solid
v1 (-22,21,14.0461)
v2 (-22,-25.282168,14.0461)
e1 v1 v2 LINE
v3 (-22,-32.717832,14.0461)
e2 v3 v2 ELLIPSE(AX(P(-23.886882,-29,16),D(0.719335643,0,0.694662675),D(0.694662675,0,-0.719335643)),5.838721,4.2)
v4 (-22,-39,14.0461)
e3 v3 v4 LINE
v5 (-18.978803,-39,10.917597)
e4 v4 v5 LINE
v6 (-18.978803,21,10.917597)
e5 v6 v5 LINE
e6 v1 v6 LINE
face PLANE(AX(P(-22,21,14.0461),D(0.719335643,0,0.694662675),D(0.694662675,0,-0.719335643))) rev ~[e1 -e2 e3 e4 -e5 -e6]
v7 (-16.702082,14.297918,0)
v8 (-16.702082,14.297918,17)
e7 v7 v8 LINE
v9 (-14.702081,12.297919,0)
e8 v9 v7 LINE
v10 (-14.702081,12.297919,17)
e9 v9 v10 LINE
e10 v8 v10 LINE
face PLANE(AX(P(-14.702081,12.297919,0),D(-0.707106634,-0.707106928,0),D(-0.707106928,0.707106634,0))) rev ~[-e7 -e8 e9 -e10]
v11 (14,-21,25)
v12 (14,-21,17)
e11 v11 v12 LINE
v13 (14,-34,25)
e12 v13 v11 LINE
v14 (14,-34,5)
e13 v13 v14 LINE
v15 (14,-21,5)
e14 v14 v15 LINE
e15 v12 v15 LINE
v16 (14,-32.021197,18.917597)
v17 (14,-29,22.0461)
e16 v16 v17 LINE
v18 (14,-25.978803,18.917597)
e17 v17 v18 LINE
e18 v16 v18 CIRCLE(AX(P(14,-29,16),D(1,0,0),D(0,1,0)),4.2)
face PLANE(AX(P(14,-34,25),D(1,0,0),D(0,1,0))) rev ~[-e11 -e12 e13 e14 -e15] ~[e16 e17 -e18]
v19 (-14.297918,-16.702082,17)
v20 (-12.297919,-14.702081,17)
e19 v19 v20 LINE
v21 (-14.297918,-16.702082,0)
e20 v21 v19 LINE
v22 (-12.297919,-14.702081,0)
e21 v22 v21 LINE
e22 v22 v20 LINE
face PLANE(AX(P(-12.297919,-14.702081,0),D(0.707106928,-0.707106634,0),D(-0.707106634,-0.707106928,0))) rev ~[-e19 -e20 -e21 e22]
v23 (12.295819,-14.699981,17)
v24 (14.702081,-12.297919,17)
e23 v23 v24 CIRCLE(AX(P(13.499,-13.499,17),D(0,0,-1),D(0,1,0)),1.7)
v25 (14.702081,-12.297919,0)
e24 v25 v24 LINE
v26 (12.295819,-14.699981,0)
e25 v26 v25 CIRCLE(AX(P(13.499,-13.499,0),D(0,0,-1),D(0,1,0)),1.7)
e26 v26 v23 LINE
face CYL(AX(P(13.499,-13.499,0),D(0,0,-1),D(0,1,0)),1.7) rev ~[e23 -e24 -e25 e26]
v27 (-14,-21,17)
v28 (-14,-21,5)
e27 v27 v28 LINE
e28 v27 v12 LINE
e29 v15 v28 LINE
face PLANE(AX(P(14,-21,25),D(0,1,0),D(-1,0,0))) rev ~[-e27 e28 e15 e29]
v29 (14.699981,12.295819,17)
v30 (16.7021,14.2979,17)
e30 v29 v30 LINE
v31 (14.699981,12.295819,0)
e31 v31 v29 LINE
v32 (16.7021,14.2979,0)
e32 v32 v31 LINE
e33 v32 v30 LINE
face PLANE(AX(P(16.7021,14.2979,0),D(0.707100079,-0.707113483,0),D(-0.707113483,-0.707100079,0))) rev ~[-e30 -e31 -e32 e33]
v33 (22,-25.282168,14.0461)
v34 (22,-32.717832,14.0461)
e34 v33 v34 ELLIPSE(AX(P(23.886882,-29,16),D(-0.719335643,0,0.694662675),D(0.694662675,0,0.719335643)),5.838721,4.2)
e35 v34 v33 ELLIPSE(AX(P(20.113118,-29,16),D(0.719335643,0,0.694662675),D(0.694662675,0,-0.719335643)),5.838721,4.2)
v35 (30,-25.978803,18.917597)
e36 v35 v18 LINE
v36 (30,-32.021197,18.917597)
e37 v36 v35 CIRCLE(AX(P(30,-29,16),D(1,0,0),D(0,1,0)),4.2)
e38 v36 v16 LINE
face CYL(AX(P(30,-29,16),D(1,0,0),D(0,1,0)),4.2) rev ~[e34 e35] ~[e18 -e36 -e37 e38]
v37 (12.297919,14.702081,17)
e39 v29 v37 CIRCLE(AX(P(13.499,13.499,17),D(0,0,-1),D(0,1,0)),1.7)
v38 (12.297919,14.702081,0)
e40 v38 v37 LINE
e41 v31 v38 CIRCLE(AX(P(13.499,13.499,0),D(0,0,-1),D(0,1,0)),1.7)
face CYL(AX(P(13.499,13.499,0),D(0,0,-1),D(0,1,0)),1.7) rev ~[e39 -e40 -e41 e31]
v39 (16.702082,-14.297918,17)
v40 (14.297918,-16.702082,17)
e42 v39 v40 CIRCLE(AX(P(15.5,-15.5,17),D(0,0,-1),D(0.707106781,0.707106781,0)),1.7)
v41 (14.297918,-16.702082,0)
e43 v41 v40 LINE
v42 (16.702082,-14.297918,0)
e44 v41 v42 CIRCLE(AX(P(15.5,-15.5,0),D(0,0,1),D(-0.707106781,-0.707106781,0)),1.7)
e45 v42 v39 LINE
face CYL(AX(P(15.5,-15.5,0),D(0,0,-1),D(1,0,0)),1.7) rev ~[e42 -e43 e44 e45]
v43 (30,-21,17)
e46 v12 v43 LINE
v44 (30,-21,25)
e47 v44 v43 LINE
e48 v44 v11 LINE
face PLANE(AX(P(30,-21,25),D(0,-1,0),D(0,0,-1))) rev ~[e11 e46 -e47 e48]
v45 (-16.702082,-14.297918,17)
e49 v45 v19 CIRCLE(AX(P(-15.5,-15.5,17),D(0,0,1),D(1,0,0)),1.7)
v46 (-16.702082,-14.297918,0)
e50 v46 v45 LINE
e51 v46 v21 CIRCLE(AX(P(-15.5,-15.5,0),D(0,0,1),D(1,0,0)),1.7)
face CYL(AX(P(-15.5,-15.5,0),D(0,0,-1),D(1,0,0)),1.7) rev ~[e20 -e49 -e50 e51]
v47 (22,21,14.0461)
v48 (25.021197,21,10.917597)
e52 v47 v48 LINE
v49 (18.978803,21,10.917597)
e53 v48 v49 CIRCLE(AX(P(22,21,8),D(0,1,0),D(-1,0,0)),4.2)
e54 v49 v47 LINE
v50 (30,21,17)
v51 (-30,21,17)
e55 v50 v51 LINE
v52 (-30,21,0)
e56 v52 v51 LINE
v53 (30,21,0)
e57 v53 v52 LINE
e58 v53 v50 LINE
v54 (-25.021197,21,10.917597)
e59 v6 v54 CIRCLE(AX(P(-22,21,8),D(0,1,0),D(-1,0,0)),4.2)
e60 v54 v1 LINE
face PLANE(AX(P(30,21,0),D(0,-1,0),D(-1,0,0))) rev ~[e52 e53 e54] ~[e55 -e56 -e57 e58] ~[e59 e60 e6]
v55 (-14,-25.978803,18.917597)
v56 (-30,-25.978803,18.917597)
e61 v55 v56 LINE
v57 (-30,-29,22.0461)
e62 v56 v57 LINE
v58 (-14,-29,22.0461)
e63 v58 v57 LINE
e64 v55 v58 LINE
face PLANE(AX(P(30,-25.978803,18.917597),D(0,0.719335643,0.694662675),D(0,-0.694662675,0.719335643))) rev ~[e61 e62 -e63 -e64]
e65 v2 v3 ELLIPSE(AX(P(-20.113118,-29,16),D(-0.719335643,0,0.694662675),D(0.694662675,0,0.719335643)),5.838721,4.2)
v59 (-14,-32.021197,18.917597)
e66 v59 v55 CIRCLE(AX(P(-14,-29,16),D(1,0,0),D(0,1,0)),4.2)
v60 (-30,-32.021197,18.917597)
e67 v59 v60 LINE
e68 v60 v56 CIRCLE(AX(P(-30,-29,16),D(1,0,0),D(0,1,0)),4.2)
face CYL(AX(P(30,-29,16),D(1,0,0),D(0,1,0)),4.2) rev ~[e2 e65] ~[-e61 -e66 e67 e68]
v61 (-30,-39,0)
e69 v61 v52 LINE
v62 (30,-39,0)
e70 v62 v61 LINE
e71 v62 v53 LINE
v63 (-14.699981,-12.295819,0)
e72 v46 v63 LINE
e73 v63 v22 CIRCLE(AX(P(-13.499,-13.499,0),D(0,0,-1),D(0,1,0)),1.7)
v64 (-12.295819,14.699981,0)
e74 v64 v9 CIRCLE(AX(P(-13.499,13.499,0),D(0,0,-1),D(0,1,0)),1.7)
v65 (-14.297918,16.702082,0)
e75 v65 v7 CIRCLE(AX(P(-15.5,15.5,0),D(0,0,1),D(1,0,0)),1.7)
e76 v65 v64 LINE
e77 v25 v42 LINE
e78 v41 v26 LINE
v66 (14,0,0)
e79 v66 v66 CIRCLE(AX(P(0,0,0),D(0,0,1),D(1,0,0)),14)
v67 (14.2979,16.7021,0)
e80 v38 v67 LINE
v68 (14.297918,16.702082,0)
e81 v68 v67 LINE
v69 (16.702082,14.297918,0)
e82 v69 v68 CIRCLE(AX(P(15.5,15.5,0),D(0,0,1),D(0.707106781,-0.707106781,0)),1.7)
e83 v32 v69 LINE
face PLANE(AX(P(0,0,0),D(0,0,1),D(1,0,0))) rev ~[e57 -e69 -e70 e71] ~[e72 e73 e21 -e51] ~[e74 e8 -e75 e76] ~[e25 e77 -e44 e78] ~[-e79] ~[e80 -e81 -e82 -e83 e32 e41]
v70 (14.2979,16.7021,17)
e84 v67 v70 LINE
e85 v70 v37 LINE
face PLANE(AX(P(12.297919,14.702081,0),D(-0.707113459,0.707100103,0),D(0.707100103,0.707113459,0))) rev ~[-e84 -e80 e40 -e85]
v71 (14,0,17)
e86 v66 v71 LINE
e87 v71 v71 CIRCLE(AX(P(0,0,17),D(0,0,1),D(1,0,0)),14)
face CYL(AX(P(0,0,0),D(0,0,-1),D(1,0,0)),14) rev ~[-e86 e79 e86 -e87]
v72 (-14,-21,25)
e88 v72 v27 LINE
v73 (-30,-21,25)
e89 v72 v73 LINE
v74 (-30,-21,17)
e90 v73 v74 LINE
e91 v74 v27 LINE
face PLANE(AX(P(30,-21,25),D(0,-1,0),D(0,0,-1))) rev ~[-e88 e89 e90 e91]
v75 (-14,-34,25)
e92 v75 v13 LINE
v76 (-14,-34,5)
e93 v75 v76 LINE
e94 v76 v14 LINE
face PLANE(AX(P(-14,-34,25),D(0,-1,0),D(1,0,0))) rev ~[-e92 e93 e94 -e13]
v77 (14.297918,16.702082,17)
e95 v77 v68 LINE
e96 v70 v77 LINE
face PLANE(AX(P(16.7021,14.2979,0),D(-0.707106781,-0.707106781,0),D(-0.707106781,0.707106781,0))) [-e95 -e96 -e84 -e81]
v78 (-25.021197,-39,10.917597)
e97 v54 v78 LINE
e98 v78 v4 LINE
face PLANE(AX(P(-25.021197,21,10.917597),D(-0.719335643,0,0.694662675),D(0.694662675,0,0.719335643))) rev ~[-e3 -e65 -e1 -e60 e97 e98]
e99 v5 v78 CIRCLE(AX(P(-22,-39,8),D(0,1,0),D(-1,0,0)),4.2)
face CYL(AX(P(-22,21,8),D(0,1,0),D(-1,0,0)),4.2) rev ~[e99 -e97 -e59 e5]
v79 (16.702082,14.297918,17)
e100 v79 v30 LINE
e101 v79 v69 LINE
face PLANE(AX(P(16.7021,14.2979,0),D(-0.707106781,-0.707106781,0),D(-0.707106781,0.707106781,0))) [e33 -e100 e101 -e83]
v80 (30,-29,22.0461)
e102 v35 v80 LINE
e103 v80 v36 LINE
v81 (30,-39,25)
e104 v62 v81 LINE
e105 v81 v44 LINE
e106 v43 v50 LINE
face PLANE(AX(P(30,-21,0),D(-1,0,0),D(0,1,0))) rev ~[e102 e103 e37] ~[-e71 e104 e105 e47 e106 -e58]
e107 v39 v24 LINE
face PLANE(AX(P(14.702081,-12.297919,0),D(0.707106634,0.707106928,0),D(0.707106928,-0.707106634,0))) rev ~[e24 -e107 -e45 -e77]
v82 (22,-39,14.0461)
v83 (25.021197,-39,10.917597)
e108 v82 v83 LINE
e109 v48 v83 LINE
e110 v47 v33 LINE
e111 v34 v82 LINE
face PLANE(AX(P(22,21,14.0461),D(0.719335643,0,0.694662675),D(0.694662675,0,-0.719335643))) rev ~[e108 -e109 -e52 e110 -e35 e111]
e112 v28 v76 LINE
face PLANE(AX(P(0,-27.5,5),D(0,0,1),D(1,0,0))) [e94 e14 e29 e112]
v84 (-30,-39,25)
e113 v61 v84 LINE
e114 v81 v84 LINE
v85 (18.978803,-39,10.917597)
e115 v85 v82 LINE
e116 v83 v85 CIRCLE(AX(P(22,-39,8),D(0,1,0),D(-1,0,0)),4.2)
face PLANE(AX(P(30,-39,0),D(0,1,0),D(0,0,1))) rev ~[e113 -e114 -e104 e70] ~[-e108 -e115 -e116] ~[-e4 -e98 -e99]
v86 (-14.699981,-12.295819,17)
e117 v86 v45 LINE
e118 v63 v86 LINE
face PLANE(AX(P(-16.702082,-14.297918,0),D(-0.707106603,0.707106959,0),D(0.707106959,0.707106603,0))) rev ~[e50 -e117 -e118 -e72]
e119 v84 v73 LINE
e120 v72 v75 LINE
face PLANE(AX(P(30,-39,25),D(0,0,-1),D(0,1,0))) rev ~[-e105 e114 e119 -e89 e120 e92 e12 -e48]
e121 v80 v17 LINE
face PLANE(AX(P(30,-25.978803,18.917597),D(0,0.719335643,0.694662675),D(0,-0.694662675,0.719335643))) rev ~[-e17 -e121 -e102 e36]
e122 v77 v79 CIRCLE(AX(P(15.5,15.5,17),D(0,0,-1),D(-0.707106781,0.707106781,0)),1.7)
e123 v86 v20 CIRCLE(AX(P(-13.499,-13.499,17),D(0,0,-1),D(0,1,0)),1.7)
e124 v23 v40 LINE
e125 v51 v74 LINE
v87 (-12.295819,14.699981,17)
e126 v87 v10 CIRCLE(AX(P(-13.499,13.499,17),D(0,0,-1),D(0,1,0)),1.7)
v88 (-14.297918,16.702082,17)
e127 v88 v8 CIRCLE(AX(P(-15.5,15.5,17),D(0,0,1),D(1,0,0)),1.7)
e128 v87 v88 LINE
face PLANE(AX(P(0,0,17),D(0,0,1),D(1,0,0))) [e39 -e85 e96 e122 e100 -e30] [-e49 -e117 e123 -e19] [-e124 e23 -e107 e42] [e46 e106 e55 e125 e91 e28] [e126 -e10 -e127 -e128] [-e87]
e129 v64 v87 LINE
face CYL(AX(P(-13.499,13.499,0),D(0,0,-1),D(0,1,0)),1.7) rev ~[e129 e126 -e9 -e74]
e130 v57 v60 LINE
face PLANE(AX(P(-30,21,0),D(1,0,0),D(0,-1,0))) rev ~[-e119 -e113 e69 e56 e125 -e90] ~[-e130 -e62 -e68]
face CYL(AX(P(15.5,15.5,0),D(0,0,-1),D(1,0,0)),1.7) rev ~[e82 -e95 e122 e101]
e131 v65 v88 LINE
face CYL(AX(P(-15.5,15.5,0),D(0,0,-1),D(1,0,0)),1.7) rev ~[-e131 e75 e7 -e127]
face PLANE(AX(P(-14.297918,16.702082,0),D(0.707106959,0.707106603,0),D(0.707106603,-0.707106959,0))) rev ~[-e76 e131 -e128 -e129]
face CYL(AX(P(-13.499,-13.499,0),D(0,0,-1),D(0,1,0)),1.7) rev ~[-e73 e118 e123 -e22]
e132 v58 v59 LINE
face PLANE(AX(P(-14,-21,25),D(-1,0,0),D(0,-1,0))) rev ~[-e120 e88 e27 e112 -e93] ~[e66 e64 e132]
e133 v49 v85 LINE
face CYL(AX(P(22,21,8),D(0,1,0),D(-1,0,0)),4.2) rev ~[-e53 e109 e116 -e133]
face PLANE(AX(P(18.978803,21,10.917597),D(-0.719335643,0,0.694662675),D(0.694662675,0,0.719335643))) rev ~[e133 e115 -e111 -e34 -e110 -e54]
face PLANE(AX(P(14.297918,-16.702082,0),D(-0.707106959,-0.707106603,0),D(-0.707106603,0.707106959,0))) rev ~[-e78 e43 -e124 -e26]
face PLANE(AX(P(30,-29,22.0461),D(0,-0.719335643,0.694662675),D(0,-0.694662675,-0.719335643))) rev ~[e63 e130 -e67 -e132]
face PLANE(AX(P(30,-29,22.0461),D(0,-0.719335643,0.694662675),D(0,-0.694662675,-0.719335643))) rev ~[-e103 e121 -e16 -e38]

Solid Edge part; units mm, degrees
sketch "Sketch1" plane through (0, 0, 0) normal (0, 0, 1) x (1, 0, 0)
  circle A0 centre (-15.5, 15.5) radius 1.7
  circle A1 centre (15.5, 15.5) radius 1.7
  circle A2 centre (15.5, -15.5) radius 1.7
  circle A3 centre (-15.5, -15.5) radius 1.7
  line L0 (-30, -21) -> (30, -21)
  line L1 (30, -21) -> (30, 21)
  line L2 (30, 21) -> (-30, 21)
  line L3 (-30, 21) -> (-30, -21)
  circle A4 centre (0, 0) radius 14
  dimension "D1" = 42
  dimension "D2" = 60
extrude "Protrusion1" add sketch "Sketch1" along normal blind 17
sketch "Sketch2" plane through (30, 0, 8.5) normal (1, 0, 0) x (0, 1, 0)
  line L0 (-21, -8.5) -> (-39, -8.5)
  line L1 (-39, -8.5) -> (-39, 16.5)
  line L2 (-39, 16.5) -> (-21, 16.5)
  line L3 (-21, 16.5) -> (-21, -8.5)
  dimension "D1" = 18
  dimension "D2" = 25
extrude "Protrusion2" add sketch "Sketch2" against normal up to vertex (60 mm away)
sketch "Sketch3" plane through (0, 21, 8.5) normal (0, 1, 0) x (-1, 0, 0)
  line L0 (-22, 5.5461) -> (-25.0212, 2.4176)
  line L1 (-18.9788, 2.4176) -> (-22, 5.5461)
  arc A0 (-25.0212, 2.4176) -> (-18.9788, 2.4176) centre (-22, -0.5) ccw
  line L2 (22, 5.5461) -> (18.9788, 2.4176)
  line L3 (25.0212, 2.4176) -> (22, 5.5461)
  arc A1 (18.9788, 2.4176) -> (25.0212, 2.4176) centre (22, -0.5) ccw
  dimension "D1" = 8
  dimension "D2" = 8.4
  dimension "D3" = 8.4
  dimension "D4" = 8
  dimension "D5" = 8
extrude "Cutout1" cut sketch "Sketch3" against normal through all
sketch "Sketch4" plane through (30, -8, 12.5) normal (1, 0, 0) x (0, 1, 0)
  line L0 (-17.9788, 6.4176) -> (-21, 9.5461)
  line L1 (-21, 9.5461) -> (-24.0212, 6.4176)
  arc A0 (-24.0212, 6.4176) -> (-17.9788, 6.4176) centre (-21, 3.5) ccw
extrude "Cutout2" cut sketch "Sketch4" against normal through all
sketch "Sketch5" plane through (0, -30, 25) normal (0, 0, 1) x (0, -1, 0)
  line L0 (-9, -14) -> (4, -14)
  line L1 (4, -14) -> (4, 14)
  line L2 (4, 14) -> (-9, 14)
  line L3 (-9, 14) -> (-9, -14)
extrude "ExtrudedCutout_3" cut sketch "Sketch5" against normal blind 20
sketch "Sketch6" plane through (0, -9, 0) normal (0, 0, -1) x (0, 1, 0)
  line L0 (23.2979, 16.7021) -> (21.2958, 14.7)
  arc A0 (21.2958, 14.7) -> (23.7021, 12.2979) centre (22.499, 13.499) ccw
  line L1 (23.7021, 12.2979) -> (25.7021, 14.2979)
  line L2 (23.2979, 16.7021) -> (25.7021, 14.2979)
  line L3 (25.7021, -14.2979) -> (23.7, -12.2958)
  arc A1 (23.7, -12.2958) -> (21.2979, -14.7021) centre (22.499, -13.499) ccw
  line L4 (21.2979, -14.7021) -> (23.2979, -16.7021)
  arc A2 (25.7021, -14.2979) -> (23.2979, -16.7021) centre (24.5, -15.5) ccw
  line L5 (-5.2979, -16.7021) -> (-3.2958, -14.7)
  arc A3 (-3.2958, -14.7) -> (-5.7021, -12.2979) centre (-4.499, -13.499) ccw
  line L6 (-5.7021, -12.2979) -> (-7.7021, -14.2979)
  arc A4 (-5.2979, -16.7021) -> (-7.7021, -14.2979) centre (-6.5, -15.5) ccw
  line L7 (-7.7021, 14.2979) -> (-5.7, 12.2958)
  arc A5 (-5.7, 12.2958) -> (-3.2979, 14.7021) centre (-4.499, 13.499) ccw
  line L8 (-3.2979, 14.7021) -> (-5.2979, 16.7021)
  arc A6 (-7.7021, 14.2979) -> (-5.2979, 16.7021) centre (-6.5, 15.5) ccw
extrude "Cutout3" cut sketch "Sketch6" against normal through all
